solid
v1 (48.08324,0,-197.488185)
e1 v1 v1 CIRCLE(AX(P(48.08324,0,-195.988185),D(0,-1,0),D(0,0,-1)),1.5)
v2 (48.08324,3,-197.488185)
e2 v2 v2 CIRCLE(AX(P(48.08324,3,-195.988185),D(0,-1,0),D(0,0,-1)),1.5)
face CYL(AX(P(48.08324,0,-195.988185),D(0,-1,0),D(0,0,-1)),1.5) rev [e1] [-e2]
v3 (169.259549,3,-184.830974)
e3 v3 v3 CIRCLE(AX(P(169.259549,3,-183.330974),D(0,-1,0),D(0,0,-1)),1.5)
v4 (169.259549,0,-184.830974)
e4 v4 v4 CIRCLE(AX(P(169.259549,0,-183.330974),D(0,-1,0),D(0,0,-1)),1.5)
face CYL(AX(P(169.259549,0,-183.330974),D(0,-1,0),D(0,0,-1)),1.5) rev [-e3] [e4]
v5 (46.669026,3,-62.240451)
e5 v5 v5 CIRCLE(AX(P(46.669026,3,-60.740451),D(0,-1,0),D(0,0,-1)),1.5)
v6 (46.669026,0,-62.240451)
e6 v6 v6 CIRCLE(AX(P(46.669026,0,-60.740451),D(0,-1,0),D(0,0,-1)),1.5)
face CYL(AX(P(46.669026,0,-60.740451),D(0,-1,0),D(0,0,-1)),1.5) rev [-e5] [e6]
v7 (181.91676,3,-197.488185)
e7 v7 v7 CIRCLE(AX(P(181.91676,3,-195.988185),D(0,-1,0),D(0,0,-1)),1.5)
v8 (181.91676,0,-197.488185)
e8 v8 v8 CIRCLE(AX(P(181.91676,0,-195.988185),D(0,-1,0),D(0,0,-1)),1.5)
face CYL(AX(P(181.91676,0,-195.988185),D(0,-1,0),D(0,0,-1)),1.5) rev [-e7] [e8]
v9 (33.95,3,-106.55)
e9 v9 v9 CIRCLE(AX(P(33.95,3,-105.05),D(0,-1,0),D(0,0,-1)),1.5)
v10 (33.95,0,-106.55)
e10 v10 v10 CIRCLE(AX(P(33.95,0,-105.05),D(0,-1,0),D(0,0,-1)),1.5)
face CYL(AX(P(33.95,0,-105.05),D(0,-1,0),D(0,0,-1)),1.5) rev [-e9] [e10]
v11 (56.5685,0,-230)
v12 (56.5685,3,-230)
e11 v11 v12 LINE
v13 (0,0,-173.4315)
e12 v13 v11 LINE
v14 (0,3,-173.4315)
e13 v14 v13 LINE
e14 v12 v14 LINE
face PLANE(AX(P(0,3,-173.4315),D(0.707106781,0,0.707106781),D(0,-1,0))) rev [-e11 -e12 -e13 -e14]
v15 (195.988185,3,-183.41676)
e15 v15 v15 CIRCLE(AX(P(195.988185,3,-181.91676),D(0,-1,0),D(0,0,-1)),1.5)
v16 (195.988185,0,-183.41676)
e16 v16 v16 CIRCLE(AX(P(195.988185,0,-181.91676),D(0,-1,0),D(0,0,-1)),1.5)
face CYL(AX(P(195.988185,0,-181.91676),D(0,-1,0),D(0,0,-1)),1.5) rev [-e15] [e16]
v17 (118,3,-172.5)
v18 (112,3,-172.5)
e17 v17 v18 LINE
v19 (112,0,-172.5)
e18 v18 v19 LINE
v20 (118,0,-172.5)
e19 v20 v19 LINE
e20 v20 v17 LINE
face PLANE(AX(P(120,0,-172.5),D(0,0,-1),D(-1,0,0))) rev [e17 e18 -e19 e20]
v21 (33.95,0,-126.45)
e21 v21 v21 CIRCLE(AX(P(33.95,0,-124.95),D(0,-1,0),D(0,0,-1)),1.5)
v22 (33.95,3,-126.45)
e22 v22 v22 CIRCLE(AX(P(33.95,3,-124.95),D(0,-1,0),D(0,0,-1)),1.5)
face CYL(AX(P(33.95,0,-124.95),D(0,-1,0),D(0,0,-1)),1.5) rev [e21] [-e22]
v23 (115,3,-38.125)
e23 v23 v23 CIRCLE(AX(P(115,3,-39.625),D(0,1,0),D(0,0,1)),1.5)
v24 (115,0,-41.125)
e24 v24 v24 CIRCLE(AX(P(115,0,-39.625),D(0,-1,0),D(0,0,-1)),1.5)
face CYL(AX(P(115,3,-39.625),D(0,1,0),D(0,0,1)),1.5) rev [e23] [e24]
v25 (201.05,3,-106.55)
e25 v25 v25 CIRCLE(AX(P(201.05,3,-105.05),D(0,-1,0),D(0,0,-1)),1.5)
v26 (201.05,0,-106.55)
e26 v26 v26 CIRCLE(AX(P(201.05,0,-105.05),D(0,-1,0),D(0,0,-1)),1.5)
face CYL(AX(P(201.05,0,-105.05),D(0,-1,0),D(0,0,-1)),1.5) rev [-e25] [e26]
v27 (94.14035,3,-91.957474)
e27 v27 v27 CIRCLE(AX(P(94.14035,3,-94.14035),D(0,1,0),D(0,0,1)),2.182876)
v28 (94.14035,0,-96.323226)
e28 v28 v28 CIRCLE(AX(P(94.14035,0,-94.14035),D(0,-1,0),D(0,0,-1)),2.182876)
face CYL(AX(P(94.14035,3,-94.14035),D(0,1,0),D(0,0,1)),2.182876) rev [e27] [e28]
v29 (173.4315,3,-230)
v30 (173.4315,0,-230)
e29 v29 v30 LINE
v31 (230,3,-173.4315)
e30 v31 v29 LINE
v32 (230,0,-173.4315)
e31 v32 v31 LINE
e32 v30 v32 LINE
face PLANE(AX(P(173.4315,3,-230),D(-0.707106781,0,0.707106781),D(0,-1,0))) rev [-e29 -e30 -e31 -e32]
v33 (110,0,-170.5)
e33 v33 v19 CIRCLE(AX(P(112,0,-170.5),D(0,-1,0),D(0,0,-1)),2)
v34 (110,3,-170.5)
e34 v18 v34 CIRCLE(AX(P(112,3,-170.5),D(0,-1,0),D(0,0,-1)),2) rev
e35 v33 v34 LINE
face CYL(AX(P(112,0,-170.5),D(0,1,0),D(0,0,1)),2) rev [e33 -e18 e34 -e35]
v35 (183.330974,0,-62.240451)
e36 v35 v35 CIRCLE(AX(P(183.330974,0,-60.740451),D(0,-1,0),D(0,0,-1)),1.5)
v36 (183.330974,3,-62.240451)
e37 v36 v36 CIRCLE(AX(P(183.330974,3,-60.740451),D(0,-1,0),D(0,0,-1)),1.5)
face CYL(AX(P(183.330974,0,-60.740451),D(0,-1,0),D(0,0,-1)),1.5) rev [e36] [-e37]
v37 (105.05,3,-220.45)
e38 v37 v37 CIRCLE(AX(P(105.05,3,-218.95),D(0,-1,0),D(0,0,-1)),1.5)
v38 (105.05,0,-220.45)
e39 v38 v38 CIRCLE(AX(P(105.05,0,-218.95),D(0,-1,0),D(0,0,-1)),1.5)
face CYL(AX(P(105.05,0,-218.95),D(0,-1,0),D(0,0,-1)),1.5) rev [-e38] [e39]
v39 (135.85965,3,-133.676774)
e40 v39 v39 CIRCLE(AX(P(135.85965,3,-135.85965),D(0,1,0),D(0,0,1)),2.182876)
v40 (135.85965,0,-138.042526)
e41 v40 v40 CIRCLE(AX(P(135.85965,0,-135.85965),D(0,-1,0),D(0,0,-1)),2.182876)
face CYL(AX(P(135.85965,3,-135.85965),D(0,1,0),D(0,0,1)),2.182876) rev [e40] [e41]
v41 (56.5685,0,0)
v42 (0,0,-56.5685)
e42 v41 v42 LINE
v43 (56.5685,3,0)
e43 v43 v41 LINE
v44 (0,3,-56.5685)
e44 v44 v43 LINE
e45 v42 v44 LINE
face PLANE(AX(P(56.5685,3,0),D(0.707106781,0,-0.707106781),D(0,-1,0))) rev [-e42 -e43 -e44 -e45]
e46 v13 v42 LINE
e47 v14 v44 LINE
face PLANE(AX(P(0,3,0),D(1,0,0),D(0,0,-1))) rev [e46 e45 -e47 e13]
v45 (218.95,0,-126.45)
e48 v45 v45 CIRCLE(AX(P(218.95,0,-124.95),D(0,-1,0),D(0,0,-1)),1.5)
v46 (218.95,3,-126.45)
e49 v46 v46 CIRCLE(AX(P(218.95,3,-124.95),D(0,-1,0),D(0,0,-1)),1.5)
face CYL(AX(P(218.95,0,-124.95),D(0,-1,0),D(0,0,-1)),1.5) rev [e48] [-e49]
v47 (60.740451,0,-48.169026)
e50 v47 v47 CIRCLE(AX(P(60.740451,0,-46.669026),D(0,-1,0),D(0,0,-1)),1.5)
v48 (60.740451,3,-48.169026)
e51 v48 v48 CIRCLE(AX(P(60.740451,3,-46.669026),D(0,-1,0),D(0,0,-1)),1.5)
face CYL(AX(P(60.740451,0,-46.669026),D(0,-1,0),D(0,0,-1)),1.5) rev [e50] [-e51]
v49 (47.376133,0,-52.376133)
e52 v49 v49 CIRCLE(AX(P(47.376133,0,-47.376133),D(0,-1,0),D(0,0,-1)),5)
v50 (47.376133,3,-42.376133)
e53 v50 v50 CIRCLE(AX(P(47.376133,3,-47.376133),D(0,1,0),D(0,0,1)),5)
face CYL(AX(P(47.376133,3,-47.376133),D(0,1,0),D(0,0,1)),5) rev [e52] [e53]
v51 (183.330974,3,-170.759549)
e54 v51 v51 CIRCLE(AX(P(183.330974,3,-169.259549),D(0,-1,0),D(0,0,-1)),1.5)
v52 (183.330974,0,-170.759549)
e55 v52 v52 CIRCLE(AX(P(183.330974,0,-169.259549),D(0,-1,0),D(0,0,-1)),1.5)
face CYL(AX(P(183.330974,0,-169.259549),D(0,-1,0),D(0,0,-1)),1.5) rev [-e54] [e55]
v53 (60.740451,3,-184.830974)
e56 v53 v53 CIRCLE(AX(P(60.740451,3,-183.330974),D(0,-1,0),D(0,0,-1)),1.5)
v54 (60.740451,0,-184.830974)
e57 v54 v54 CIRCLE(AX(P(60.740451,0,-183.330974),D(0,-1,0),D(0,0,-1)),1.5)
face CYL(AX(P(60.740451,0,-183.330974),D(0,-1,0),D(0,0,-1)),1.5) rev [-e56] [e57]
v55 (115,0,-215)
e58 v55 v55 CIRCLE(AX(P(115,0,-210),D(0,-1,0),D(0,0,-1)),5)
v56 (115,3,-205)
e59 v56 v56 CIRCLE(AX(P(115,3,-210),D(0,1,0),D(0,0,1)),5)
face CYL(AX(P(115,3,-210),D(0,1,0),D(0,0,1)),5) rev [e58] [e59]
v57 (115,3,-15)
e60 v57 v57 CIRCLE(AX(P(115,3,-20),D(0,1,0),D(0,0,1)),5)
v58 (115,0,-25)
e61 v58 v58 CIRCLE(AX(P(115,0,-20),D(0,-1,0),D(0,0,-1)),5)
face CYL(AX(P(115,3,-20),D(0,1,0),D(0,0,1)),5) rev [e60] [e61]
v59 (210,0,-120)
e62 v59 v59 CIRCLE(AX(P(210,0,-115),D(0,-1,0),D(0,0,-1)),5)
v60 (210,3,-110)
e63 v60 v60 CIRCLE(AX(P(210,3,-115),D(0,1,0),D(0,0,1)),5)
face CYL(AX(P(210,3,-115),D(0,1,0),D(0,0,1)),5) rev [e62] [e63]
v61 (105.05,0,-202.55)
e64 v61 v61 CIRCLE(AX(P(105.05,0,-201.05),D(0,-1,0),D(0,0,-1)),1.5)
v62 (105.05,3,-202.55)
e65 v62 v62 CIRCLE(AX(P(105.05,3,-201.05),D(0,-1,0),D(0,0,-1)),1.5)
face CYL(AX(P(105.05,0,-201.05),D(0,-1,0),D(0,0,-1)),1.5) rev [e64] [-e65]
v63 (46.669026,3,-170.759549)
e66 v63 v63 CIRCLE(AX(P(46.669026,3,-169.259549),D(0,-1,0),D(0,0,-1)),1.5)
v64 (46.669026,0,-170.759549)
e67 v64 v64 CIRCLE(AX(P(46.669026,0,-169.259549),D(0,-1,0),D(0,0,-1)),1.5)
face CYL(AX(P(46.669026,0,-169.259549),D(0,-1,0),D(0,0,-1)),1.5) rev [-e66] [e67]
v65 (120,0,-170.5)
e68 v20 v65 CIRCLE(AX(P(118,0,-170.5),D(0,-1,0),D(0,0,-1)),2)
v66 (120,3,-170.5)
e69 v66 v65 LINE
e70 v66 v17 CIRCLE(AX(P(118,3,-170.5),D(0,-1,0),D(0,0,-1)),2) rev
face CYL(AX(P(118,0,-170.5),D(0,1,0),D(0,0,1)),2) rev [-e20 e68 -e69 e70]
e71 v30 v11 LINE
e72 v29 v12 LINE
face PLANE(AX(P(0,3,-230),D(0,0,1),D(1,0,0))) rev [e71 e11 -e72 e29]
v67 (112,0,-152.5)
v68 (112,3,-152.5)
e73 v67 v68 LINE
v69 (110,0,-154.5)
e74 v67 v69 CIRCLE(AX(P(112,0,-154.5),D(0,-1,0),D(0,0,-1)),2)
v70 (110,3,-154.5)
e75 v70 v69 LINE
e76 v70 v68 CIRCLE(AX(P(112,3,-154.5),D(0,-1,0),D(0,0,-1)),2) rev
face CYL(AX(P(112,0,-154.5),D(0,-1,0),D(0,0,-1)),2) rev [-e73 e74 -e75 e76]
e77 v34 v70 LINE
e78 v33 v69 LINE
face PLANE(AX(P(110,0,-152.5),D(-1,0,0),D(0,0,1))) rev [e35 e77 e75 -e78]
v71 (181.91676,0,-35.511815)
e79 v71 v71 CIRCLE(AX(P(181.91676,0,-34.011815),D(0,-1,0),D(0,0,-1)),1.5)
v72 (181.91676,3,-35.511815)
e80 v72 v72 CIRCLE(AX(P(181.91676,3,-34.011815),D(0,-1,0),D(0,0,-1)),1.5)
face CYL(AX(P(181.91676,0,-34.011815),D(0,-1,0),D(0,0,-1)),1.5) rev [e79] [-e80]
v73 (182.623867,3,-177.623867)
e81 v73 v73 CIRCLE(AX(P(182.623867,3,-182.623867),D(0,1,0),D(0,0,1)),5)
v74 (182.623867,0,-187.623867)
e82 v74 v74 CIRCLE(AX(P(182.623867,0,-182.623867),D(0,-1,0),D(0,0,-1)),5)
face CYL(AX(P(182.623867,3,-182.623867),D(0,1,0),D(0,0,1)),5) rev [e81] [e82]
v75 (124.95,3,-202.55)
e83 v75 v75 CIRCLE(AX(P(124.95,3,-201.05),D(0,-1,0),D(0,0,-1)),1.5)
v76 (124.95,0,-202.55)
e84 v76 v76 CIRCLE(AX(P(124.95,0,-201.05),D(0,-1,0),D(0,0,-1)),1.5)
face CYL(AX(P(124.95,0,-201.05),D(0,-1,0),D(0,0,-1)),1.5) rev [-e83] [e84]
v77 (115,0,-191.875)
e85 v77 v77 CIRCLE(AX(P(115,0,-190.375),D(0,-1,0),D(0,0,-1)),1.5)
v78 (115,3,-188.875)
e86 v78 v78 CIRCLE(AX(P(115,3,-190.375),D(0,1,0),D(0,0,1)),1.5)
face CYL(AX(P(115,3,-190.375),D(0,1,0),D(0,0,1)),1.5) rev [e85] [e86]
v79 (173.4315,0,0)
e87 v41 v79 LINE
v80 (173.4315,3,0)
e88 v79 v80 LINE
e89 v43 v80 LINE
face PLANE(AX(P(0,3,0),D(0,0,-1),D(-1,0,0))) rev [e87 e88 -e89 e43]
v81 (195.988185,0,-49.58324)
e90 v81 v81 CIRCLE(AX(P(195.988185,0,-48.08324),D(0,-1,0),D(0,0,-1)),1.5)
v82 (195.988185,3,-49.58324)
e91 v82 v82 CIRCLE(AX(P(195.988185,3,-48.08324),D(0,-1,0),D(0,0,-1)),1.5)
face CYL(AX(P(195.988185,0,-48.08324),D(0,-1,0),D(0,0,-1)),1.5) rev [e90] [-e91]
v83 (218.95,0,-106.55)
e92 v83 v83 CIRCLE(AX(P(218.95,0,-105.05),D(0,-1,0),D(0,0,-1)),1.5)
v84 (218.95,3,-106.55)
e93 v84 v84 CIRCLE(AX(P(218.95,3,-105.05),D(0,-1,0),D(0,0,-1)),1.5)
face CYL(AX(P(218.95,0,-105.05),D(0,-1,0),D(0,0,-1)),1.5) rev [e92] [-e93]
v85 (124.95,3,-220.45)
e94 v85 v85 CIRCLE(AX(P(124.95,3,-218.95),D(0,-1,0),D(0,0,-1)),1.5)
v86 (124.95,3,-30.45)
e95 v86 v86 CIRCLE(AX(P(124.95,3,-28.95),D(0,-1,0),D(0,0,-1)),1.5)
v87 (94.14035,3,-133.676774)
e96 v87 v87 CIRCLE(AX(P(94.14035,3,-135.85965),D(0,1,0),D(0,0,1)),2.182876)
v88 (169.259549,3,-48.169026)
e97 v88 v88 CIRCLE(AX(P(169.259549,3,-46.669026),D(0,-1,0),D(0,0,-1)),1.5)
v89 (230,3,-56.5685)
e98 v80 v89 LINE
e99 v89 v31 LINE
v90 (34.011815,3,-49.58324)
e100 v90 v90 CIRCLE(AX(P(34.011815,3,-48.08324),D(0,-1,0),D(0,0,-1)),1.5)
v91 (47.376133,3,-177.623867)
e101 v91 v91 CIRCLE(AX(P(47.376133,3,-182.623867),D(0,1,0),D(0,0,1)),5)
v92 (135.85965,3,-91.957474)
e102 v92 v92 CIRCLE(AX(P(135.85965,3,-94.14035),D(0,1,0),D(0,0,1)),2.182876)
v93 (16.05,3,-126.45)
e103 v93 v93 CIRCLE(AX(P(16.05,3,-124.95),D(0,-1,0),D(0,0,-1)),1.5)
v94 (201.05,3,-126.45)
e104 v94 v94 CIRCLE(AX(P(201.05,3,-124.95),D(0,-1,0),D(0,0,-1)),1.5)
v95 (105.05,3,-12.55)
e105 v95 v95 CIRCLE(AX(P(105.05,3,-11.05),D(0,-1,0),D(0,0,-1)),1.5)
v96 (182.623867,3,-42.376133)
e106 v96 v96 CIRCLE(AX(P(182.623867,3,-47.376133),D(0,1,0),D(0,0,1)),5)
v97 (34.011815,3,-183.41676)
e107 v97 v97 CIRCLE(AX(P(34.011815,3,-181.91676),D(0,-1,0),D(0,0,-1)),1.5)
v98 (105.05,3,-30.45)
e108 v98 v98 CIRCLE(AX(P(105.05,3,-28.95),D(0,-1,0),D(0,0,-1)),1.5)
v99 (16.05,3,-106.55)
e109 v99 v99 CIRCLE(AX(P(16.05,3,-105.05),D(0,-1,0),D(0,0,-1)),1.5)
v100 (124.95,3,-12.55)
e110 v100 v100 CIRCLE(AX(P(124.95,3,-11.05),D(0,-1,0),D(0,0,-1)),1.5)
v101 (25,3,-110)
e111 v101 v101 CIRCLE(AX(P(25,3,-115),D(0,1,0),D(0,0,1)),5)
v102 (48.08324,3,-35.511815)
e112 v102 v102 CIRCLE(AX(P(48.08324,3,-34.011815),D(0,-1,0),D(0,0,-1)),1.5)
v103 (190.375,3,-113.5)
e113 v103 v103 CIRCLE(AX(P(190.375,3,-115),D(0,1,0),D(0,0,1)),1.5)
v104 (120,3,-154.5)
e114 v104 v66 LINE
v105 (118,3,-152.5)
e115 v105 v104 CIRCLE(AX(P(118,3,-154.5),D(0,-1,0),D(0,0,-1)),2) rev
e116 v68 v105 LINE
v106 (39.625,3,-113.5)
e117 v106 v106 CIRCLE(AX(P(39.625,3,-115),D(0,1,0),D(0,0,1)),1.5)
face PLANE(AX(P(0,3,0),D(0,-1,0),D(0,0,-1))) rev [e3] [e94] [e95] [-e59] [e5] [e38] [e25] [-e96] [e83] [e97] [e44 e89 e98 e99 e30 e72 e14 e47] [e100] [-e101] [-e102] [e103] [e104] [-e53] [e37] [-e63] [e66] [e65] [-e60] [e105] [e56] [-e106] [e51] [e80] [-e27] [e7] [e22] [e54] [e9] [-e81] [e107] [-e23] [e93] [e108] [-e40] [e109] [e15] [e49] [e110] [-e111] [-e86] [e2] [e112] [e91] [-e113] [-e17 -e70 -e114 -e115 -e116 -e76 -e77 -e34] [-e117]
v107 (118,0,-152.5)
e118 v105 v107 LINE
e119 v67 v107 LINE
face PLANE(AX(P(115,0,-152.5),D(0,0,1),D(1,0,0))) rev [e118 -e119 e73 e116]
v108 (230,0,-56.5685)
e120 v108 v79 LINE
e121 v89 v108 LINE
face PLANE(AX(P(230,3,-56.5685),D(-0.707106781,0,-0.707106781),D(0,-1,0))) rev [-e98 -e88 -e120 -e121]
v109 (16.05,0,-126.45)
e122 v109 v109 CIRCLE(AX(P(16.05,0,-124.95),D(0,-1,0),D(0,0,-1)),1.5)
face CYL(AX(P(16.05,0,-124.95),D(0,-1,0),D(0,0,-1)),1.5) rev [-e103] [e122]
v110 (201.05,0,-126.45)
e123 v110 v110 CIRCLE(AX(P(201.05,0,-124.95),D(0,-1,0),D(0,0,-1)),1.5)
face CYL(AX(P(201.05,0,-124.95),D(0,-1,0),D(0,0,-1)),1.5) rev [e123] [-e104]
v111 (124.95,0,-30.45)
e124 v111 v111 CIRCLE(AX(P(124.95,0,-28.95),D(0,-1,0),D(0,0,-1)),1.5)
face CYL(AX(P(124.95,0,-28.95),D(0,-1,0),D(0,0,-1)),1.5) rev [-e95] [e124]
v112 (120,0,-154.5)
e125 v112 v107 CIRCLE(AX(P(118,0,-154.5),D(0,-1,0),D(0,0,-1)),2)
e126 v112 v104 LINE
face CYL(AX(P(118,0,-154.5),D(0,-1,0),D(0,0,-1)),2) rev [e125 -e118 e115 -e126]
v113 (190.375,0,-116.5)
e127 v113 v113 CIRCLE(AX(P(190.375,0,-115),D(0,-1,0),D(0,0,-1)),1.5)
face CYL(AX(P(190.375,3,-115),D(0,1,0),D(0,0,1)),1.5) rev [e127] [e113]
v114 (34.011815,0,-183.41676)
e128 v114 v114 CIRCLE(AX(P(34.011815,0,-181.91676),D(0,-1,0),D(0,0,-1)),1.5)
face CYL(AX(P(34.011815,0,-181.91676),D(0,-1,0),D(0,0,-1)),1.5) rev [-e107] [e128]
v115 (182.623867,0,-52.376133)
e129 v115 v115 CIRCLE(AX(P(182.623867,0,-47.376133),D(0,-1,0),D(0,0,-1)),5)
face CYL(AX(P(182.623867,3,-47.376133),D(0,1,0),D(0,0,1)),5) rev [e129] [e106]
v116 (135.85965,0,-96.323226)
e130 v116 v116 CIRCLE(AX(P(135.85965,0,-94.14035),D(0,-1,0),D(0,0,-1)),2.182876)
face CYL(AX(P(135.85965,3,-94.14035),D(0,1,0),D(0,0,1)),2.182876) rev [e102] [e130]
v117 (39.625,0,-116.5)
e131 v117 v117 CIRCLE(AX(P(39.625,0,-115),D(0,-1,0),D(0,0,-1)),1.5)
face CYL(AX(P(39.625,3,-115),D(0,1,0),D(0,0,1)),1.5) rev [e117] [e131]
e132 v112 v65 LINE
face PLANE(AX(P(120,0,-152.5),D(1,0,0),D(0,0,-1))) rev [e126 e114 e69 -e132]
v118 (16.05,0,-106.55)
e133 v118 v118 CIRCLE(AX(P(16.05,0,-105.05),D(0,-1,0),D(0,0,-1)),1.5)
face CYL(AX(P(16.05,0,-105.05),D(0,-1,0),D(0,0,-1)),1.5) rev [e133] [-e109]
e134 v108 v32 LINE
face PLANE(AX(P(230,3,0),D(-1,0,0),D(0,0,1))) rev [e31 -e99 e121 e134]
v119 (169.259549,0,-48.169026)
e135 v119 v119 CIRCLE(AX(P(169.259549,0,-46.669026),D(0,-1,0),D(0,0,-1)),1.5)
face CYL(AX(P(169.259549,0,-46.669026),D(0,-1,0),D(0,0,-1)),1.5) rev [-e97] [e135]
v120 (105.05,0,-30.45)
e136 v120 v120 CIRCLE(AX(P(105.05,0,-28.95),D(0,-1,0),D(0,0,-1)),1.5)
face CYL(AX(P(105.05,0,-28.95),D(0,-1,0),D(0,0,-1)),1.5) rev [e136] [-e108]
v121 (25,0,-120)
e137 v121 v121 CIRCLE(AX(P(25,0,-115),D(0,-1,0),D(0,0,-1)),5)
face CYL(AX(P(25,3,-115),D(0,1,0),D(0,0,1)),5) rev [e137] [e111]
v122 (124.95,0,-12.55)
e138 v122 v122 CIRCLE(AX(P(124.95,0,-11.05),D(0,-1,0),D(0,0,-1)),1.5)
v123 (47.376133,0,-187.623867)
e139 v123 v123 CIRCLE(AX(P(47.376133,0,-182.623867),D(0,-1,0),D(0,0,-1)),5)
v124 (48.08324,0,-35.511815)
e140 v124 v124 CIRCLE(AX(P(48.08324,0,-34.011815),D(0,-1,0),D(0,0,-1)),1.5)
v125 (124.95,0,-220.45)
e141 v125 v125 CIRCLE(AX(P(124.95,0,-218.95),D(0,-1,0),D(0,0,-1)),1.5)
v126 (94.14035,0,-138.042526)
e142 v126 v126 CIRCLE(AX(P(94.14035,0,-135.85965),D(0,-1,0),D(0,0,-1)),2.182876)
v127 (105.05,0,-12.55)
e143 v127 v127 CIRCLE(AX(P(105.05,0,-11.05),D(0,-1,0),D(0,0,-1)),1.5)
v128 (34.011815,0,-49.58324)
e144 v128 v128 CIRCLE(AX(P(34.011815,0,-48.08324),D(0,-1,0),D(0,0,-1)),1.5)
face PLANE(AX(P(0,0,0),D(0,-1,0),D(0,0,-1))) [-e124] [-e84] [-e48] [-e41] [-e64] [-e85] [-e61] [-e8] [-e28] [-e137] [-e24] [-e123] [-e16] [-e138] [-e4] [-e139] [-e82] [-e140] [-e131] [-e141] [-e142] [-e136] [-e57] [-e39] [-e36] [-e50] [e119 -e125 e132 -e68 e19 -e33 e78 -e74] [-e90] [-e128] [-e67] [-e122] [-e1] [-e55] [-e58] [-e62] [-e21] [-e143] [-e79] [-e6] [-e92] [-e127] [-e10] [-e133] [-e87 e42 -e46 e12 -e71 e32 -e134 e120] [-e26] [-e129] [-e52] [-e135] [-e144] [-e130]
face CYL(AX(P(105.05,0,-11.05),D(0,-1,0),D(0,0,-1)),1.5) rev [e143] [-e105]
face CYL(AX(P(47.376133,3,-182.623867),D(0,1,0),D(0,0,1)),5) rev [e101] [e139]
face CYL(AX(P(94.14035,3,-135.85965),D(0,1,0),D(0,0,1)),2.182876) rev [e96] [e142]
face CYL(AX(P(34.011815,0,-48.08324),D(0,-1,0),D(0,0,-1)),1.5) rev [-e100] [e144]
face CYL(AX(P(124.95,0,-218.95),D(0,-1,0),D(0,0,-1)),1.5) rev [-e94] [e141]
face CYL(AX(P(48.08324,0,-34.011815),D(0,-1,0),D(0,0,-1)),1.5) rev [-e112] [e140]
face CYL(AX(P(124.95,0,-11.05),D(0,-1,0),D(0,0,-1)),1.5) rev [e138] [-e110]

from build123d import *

# Parameters (mm, degrees)
SKETCH1_W                        = 230
SKETCH1_H                        = 230
BOSS_EXTRUDE1_DEPTH              = 3
CHAMFER2_START                   = -1
CHAMFER2_OUTLINE_W               = 82
CHAMFER2_OUTLINE_H               = 3
CHAMFER2_DEPTH                   = 40.999969952
CHAMFER3_START                   = -164
CHAMFER3_OUTLINE_W               = 83
CHAMFER3_OUTLINE_H               = 3
CHAMFER3_DEPTH                   = 41.365410279
CHAMFER4_START                   = 285.269149394
CHAMFER4_OUTLINE_W               = 82
CHAMFER4_OUTLINE_H               = 3
CHAMFER4_DEPTH                   = 40.730850606
CHAMFER5_START                   = 122.634589721
CHAMFER5_OUTLINE_W               = 83
CHAMFER5_OUTLINE_H               = 3
CHAMFER5_DEPTH                   = 41.365410279
F_11_64_0_17188_DIAMETER_HOLE1_D = 4.365752
CUT_EXTRUDE3_DEPTH               = 326.28295375
FILLET9_R                        = 2
FILLET10_R                       = 2
FILLET11_R                       = 2
FILLET12_R                       = 2
F_10_0MM_DOWEL_HOLE1_D           = 10
F_3_0MM_DOWEL_HOLE1_D            = 3
F_3_0MM_DOWEL_HOLE2_D            = 3


with BuildPart() as part:
    # Sketch1 → Boss-Extrude1 (new body)
    with BuildSketch(Plane(origin=(0, 0, 0), x_dir=(1, 0, 0), z_dir=(0, 1, 0))):
        with Locations((115, 115)):
            Rectangle(SKETCH1_W, SKETCH1_H)
    extrude(amount=BOSS_EXTRUDE1_DEPTH)

    # Chamfer2: read off the stored shape, not the designer's step
    # Chamfer2 outline → Chamfer2 (cut)
    with BuildSketch(Plane(origin=(0, 0, 0), x_dir=(0.7071067811865474, 0, 0.7071067811865477), z_dir=(0.7071067811865476, 0, -0.7071067811865476)).offset(CHAMFER2_START)):
        with Locations((0, -1.5)):
            Rectangle(CHAMFER2_OUTLINE_W, CHAMFER2_OUTLINE_H)
    extrude(amount=CHAMFER2_DEPTH, mode=Mode.SUBTRACT)

    # Chamfer3: read off the stored shape, not the designer's step
    # Chamfer3 outline → Chamfer3 (cut)
    with BuildSketch(Plane(origin=(0, 0, 0), x_dir=(0.7071067811865474, 0, -0.7071067811865477), z_dir=(0.7071067811865476, 0, 0.7071067811865476)).offset(CHAMFER3_START)):
        with Locations((162.5, 1.5)):
            Rectangle(CHAMFER3_OUTLINE_W, CHAMFER3_OUTLINE_H)
    extrude(amount=CHAMFER3_DEPTH, mode=Mode.SUBTRACT)

    # Chamfer4: read off the stored shape, not the designer's step
    # Chamfer4 outline → Chamfer4 (cut)
    with BuildSketch(Plane(origin=(0, 0, 0), x_dir=(0.7071067811865474, 0, 0.7071067811865477), z_dir=(0.7071067811865476, 0, -0.7071067811865476)).offset(CHAMFER4_START)):
        with Locations((0, -1.5)):
            Rectangle(CHAMFER4_OUTLINE_W, CHAMFER4_OUTLINE_H)
    extrude(amount=CHAMFER4_DEPTH, mode=Mode.SUBTRACT)

    # Chamfer5: read off the stored shape, not the designer's step
    # Chamfer5 outline → Chamfer5 (cut)
    with BuildSketch(Plane(origin=(0, 0, 0), x_dir=(0.7071067811865471, 0, -0.707106781186548), z_dir=(0.707106781186548, 0, 0.707106781186547)).offset(CHAMFER5_START)):
        with Locations((162.5, 1.5)):
            Rectangle(CHAMFER5_OUTLINE_W, CHAMFER5_OUTLINE_H)
    extrude(amount=CHAMFER5_DEPTH, mode=Mode.SUBTRACT)

    # 11/64 (0.17188) Diameter Hole1 (through all)
    with Locations(Plane(origin=(0, 3, 0), x_dir=(1, 0, 0), z_dir=(0, 1, 0))):
        with Locations((94.140349955, 135.859650045), (135.859650045, 135.859650045), (135.859650045, 94.140349955), (94.140349955, 94.140349955)):
            Hole(F_11_64_0_17188_DIAMETER_HOLE1_D / 2)

    # Sketch11 → Cut-Extrude3 (cut, through all)
    with BuildSketch(Plane(origin=(0, 3, 0), x_dir=(1, 0, 0), z_dir=(0, 1, 0))):
        Polygon((115, 152.5), (120, 152.5), (120, 172.5), (110, 172.5), (110, 152.5), align=None)
    extrude(amount=-CUT_EXTRUDE3_DEPTH, mode=Mode.SUBTRACT)

    # Fillet9
    fillet9_edges = [part.edges().sort_by_distance(p)[0] for p in [
        (120, 1.5, -172.5),
    ]]
    fillet(fillet9_edges, radius=FILLET9_R)

    # Fillet10
    fillet10_edges = [part.edges().sort_by_distance(p)[0] for p in [
        (110, 1.5, -172.5),
    ]]
    fillet(fillet10_edges, radius=FILLET10_R)

    # Fillet11
    fillet11_edges = [part.edges().sort_by_distance(p)[0] for p in [
        (120, 1.5, -152.5),
    ]]
    fillet(fillet11_edges, radius=FILLET11_R)

    # Fillet12
    fillet12_edges = [part.edges().sort_by_distance(p)[0] for p in [
        (110, 1.5, -152.5),
    ]]
    fillet(fillet12_edges, radius=FILLET12_R)

    # Ø10.0mm Dowel Hole1 (through all)
    with Locations(Plane(origin=(0, 3, 0), x_dir=(1, 0, 0), z_dir=(0, 1, 0))):
        with Locations((210, 115), (182.623866908, 182.623866908), (182.623866908, 47.376133092), (115, 20), (47.376133092, 47.376133092), (25, 115), (47.376133092, 182.623866908), (115, 210)):
            Hole(F_10_0MM_DOWEL_HOLE1_D / 2)

    # Ø3.0mm Dowel Hole1 (through all)
    with Locations(Plane(origin=(0, 0, 0), x_dir=(-1, 0, 0), z_dir=(0, -1, 0))):
        with Locations((-201.05, 124.95), (-201.05, 105.05), (-218.95, 124.95), (-218.95, 105.05), (-183.330973689, 60.740451256), (-169.259548744, 46.669026311), (-181.916760127, 34.011814928), (-195.988185072, 48.083239873), (-183.330973689, 169.259548744), (-169.259548744, 183.330973689), (-181.916760127, 195.988185072), (-195.988185072, 181.916760127), (-124.95, 201.05), (-124.95, 218.95), (-105.05, 218.95), (-105.05, 201.05), (-60.740451256, 183.330973689), (-34.011814928, 181.916760127), (-46.669026311, 169.259548744), (-48.083239873, 195.988185072), (-16.05, 124.95), (-33.95, 105.05), (-33.95, 124.95), (-16.05, 105.05), (-60.740451256, 46.669026311), (-48.083239873, 34.011814928), (-46.669026311, 60.740451256), (-34.011814928, 48.083239873), (-105.05, 28.95), (-105.05, 11.05), (-124.95, 28.95), (-124.95, 11.05)):
            Hole(F_3_0MM_DOWEL_HOLE1_D / 2)

    # Ø3.0mm Dowel Hole2 (through all)
    with Locations(Plane(origin=(0, 3, 0), x_dir=(1, 0, 0), z_dir=(0, 1, 0))):
        with Locations((115, 190.375), (39.625, 115), (115, 39.625), (190.375, 115)):
            Hole(F_3_0MM_DOWEL_HOLE2_D / 2)


solid = part.part
